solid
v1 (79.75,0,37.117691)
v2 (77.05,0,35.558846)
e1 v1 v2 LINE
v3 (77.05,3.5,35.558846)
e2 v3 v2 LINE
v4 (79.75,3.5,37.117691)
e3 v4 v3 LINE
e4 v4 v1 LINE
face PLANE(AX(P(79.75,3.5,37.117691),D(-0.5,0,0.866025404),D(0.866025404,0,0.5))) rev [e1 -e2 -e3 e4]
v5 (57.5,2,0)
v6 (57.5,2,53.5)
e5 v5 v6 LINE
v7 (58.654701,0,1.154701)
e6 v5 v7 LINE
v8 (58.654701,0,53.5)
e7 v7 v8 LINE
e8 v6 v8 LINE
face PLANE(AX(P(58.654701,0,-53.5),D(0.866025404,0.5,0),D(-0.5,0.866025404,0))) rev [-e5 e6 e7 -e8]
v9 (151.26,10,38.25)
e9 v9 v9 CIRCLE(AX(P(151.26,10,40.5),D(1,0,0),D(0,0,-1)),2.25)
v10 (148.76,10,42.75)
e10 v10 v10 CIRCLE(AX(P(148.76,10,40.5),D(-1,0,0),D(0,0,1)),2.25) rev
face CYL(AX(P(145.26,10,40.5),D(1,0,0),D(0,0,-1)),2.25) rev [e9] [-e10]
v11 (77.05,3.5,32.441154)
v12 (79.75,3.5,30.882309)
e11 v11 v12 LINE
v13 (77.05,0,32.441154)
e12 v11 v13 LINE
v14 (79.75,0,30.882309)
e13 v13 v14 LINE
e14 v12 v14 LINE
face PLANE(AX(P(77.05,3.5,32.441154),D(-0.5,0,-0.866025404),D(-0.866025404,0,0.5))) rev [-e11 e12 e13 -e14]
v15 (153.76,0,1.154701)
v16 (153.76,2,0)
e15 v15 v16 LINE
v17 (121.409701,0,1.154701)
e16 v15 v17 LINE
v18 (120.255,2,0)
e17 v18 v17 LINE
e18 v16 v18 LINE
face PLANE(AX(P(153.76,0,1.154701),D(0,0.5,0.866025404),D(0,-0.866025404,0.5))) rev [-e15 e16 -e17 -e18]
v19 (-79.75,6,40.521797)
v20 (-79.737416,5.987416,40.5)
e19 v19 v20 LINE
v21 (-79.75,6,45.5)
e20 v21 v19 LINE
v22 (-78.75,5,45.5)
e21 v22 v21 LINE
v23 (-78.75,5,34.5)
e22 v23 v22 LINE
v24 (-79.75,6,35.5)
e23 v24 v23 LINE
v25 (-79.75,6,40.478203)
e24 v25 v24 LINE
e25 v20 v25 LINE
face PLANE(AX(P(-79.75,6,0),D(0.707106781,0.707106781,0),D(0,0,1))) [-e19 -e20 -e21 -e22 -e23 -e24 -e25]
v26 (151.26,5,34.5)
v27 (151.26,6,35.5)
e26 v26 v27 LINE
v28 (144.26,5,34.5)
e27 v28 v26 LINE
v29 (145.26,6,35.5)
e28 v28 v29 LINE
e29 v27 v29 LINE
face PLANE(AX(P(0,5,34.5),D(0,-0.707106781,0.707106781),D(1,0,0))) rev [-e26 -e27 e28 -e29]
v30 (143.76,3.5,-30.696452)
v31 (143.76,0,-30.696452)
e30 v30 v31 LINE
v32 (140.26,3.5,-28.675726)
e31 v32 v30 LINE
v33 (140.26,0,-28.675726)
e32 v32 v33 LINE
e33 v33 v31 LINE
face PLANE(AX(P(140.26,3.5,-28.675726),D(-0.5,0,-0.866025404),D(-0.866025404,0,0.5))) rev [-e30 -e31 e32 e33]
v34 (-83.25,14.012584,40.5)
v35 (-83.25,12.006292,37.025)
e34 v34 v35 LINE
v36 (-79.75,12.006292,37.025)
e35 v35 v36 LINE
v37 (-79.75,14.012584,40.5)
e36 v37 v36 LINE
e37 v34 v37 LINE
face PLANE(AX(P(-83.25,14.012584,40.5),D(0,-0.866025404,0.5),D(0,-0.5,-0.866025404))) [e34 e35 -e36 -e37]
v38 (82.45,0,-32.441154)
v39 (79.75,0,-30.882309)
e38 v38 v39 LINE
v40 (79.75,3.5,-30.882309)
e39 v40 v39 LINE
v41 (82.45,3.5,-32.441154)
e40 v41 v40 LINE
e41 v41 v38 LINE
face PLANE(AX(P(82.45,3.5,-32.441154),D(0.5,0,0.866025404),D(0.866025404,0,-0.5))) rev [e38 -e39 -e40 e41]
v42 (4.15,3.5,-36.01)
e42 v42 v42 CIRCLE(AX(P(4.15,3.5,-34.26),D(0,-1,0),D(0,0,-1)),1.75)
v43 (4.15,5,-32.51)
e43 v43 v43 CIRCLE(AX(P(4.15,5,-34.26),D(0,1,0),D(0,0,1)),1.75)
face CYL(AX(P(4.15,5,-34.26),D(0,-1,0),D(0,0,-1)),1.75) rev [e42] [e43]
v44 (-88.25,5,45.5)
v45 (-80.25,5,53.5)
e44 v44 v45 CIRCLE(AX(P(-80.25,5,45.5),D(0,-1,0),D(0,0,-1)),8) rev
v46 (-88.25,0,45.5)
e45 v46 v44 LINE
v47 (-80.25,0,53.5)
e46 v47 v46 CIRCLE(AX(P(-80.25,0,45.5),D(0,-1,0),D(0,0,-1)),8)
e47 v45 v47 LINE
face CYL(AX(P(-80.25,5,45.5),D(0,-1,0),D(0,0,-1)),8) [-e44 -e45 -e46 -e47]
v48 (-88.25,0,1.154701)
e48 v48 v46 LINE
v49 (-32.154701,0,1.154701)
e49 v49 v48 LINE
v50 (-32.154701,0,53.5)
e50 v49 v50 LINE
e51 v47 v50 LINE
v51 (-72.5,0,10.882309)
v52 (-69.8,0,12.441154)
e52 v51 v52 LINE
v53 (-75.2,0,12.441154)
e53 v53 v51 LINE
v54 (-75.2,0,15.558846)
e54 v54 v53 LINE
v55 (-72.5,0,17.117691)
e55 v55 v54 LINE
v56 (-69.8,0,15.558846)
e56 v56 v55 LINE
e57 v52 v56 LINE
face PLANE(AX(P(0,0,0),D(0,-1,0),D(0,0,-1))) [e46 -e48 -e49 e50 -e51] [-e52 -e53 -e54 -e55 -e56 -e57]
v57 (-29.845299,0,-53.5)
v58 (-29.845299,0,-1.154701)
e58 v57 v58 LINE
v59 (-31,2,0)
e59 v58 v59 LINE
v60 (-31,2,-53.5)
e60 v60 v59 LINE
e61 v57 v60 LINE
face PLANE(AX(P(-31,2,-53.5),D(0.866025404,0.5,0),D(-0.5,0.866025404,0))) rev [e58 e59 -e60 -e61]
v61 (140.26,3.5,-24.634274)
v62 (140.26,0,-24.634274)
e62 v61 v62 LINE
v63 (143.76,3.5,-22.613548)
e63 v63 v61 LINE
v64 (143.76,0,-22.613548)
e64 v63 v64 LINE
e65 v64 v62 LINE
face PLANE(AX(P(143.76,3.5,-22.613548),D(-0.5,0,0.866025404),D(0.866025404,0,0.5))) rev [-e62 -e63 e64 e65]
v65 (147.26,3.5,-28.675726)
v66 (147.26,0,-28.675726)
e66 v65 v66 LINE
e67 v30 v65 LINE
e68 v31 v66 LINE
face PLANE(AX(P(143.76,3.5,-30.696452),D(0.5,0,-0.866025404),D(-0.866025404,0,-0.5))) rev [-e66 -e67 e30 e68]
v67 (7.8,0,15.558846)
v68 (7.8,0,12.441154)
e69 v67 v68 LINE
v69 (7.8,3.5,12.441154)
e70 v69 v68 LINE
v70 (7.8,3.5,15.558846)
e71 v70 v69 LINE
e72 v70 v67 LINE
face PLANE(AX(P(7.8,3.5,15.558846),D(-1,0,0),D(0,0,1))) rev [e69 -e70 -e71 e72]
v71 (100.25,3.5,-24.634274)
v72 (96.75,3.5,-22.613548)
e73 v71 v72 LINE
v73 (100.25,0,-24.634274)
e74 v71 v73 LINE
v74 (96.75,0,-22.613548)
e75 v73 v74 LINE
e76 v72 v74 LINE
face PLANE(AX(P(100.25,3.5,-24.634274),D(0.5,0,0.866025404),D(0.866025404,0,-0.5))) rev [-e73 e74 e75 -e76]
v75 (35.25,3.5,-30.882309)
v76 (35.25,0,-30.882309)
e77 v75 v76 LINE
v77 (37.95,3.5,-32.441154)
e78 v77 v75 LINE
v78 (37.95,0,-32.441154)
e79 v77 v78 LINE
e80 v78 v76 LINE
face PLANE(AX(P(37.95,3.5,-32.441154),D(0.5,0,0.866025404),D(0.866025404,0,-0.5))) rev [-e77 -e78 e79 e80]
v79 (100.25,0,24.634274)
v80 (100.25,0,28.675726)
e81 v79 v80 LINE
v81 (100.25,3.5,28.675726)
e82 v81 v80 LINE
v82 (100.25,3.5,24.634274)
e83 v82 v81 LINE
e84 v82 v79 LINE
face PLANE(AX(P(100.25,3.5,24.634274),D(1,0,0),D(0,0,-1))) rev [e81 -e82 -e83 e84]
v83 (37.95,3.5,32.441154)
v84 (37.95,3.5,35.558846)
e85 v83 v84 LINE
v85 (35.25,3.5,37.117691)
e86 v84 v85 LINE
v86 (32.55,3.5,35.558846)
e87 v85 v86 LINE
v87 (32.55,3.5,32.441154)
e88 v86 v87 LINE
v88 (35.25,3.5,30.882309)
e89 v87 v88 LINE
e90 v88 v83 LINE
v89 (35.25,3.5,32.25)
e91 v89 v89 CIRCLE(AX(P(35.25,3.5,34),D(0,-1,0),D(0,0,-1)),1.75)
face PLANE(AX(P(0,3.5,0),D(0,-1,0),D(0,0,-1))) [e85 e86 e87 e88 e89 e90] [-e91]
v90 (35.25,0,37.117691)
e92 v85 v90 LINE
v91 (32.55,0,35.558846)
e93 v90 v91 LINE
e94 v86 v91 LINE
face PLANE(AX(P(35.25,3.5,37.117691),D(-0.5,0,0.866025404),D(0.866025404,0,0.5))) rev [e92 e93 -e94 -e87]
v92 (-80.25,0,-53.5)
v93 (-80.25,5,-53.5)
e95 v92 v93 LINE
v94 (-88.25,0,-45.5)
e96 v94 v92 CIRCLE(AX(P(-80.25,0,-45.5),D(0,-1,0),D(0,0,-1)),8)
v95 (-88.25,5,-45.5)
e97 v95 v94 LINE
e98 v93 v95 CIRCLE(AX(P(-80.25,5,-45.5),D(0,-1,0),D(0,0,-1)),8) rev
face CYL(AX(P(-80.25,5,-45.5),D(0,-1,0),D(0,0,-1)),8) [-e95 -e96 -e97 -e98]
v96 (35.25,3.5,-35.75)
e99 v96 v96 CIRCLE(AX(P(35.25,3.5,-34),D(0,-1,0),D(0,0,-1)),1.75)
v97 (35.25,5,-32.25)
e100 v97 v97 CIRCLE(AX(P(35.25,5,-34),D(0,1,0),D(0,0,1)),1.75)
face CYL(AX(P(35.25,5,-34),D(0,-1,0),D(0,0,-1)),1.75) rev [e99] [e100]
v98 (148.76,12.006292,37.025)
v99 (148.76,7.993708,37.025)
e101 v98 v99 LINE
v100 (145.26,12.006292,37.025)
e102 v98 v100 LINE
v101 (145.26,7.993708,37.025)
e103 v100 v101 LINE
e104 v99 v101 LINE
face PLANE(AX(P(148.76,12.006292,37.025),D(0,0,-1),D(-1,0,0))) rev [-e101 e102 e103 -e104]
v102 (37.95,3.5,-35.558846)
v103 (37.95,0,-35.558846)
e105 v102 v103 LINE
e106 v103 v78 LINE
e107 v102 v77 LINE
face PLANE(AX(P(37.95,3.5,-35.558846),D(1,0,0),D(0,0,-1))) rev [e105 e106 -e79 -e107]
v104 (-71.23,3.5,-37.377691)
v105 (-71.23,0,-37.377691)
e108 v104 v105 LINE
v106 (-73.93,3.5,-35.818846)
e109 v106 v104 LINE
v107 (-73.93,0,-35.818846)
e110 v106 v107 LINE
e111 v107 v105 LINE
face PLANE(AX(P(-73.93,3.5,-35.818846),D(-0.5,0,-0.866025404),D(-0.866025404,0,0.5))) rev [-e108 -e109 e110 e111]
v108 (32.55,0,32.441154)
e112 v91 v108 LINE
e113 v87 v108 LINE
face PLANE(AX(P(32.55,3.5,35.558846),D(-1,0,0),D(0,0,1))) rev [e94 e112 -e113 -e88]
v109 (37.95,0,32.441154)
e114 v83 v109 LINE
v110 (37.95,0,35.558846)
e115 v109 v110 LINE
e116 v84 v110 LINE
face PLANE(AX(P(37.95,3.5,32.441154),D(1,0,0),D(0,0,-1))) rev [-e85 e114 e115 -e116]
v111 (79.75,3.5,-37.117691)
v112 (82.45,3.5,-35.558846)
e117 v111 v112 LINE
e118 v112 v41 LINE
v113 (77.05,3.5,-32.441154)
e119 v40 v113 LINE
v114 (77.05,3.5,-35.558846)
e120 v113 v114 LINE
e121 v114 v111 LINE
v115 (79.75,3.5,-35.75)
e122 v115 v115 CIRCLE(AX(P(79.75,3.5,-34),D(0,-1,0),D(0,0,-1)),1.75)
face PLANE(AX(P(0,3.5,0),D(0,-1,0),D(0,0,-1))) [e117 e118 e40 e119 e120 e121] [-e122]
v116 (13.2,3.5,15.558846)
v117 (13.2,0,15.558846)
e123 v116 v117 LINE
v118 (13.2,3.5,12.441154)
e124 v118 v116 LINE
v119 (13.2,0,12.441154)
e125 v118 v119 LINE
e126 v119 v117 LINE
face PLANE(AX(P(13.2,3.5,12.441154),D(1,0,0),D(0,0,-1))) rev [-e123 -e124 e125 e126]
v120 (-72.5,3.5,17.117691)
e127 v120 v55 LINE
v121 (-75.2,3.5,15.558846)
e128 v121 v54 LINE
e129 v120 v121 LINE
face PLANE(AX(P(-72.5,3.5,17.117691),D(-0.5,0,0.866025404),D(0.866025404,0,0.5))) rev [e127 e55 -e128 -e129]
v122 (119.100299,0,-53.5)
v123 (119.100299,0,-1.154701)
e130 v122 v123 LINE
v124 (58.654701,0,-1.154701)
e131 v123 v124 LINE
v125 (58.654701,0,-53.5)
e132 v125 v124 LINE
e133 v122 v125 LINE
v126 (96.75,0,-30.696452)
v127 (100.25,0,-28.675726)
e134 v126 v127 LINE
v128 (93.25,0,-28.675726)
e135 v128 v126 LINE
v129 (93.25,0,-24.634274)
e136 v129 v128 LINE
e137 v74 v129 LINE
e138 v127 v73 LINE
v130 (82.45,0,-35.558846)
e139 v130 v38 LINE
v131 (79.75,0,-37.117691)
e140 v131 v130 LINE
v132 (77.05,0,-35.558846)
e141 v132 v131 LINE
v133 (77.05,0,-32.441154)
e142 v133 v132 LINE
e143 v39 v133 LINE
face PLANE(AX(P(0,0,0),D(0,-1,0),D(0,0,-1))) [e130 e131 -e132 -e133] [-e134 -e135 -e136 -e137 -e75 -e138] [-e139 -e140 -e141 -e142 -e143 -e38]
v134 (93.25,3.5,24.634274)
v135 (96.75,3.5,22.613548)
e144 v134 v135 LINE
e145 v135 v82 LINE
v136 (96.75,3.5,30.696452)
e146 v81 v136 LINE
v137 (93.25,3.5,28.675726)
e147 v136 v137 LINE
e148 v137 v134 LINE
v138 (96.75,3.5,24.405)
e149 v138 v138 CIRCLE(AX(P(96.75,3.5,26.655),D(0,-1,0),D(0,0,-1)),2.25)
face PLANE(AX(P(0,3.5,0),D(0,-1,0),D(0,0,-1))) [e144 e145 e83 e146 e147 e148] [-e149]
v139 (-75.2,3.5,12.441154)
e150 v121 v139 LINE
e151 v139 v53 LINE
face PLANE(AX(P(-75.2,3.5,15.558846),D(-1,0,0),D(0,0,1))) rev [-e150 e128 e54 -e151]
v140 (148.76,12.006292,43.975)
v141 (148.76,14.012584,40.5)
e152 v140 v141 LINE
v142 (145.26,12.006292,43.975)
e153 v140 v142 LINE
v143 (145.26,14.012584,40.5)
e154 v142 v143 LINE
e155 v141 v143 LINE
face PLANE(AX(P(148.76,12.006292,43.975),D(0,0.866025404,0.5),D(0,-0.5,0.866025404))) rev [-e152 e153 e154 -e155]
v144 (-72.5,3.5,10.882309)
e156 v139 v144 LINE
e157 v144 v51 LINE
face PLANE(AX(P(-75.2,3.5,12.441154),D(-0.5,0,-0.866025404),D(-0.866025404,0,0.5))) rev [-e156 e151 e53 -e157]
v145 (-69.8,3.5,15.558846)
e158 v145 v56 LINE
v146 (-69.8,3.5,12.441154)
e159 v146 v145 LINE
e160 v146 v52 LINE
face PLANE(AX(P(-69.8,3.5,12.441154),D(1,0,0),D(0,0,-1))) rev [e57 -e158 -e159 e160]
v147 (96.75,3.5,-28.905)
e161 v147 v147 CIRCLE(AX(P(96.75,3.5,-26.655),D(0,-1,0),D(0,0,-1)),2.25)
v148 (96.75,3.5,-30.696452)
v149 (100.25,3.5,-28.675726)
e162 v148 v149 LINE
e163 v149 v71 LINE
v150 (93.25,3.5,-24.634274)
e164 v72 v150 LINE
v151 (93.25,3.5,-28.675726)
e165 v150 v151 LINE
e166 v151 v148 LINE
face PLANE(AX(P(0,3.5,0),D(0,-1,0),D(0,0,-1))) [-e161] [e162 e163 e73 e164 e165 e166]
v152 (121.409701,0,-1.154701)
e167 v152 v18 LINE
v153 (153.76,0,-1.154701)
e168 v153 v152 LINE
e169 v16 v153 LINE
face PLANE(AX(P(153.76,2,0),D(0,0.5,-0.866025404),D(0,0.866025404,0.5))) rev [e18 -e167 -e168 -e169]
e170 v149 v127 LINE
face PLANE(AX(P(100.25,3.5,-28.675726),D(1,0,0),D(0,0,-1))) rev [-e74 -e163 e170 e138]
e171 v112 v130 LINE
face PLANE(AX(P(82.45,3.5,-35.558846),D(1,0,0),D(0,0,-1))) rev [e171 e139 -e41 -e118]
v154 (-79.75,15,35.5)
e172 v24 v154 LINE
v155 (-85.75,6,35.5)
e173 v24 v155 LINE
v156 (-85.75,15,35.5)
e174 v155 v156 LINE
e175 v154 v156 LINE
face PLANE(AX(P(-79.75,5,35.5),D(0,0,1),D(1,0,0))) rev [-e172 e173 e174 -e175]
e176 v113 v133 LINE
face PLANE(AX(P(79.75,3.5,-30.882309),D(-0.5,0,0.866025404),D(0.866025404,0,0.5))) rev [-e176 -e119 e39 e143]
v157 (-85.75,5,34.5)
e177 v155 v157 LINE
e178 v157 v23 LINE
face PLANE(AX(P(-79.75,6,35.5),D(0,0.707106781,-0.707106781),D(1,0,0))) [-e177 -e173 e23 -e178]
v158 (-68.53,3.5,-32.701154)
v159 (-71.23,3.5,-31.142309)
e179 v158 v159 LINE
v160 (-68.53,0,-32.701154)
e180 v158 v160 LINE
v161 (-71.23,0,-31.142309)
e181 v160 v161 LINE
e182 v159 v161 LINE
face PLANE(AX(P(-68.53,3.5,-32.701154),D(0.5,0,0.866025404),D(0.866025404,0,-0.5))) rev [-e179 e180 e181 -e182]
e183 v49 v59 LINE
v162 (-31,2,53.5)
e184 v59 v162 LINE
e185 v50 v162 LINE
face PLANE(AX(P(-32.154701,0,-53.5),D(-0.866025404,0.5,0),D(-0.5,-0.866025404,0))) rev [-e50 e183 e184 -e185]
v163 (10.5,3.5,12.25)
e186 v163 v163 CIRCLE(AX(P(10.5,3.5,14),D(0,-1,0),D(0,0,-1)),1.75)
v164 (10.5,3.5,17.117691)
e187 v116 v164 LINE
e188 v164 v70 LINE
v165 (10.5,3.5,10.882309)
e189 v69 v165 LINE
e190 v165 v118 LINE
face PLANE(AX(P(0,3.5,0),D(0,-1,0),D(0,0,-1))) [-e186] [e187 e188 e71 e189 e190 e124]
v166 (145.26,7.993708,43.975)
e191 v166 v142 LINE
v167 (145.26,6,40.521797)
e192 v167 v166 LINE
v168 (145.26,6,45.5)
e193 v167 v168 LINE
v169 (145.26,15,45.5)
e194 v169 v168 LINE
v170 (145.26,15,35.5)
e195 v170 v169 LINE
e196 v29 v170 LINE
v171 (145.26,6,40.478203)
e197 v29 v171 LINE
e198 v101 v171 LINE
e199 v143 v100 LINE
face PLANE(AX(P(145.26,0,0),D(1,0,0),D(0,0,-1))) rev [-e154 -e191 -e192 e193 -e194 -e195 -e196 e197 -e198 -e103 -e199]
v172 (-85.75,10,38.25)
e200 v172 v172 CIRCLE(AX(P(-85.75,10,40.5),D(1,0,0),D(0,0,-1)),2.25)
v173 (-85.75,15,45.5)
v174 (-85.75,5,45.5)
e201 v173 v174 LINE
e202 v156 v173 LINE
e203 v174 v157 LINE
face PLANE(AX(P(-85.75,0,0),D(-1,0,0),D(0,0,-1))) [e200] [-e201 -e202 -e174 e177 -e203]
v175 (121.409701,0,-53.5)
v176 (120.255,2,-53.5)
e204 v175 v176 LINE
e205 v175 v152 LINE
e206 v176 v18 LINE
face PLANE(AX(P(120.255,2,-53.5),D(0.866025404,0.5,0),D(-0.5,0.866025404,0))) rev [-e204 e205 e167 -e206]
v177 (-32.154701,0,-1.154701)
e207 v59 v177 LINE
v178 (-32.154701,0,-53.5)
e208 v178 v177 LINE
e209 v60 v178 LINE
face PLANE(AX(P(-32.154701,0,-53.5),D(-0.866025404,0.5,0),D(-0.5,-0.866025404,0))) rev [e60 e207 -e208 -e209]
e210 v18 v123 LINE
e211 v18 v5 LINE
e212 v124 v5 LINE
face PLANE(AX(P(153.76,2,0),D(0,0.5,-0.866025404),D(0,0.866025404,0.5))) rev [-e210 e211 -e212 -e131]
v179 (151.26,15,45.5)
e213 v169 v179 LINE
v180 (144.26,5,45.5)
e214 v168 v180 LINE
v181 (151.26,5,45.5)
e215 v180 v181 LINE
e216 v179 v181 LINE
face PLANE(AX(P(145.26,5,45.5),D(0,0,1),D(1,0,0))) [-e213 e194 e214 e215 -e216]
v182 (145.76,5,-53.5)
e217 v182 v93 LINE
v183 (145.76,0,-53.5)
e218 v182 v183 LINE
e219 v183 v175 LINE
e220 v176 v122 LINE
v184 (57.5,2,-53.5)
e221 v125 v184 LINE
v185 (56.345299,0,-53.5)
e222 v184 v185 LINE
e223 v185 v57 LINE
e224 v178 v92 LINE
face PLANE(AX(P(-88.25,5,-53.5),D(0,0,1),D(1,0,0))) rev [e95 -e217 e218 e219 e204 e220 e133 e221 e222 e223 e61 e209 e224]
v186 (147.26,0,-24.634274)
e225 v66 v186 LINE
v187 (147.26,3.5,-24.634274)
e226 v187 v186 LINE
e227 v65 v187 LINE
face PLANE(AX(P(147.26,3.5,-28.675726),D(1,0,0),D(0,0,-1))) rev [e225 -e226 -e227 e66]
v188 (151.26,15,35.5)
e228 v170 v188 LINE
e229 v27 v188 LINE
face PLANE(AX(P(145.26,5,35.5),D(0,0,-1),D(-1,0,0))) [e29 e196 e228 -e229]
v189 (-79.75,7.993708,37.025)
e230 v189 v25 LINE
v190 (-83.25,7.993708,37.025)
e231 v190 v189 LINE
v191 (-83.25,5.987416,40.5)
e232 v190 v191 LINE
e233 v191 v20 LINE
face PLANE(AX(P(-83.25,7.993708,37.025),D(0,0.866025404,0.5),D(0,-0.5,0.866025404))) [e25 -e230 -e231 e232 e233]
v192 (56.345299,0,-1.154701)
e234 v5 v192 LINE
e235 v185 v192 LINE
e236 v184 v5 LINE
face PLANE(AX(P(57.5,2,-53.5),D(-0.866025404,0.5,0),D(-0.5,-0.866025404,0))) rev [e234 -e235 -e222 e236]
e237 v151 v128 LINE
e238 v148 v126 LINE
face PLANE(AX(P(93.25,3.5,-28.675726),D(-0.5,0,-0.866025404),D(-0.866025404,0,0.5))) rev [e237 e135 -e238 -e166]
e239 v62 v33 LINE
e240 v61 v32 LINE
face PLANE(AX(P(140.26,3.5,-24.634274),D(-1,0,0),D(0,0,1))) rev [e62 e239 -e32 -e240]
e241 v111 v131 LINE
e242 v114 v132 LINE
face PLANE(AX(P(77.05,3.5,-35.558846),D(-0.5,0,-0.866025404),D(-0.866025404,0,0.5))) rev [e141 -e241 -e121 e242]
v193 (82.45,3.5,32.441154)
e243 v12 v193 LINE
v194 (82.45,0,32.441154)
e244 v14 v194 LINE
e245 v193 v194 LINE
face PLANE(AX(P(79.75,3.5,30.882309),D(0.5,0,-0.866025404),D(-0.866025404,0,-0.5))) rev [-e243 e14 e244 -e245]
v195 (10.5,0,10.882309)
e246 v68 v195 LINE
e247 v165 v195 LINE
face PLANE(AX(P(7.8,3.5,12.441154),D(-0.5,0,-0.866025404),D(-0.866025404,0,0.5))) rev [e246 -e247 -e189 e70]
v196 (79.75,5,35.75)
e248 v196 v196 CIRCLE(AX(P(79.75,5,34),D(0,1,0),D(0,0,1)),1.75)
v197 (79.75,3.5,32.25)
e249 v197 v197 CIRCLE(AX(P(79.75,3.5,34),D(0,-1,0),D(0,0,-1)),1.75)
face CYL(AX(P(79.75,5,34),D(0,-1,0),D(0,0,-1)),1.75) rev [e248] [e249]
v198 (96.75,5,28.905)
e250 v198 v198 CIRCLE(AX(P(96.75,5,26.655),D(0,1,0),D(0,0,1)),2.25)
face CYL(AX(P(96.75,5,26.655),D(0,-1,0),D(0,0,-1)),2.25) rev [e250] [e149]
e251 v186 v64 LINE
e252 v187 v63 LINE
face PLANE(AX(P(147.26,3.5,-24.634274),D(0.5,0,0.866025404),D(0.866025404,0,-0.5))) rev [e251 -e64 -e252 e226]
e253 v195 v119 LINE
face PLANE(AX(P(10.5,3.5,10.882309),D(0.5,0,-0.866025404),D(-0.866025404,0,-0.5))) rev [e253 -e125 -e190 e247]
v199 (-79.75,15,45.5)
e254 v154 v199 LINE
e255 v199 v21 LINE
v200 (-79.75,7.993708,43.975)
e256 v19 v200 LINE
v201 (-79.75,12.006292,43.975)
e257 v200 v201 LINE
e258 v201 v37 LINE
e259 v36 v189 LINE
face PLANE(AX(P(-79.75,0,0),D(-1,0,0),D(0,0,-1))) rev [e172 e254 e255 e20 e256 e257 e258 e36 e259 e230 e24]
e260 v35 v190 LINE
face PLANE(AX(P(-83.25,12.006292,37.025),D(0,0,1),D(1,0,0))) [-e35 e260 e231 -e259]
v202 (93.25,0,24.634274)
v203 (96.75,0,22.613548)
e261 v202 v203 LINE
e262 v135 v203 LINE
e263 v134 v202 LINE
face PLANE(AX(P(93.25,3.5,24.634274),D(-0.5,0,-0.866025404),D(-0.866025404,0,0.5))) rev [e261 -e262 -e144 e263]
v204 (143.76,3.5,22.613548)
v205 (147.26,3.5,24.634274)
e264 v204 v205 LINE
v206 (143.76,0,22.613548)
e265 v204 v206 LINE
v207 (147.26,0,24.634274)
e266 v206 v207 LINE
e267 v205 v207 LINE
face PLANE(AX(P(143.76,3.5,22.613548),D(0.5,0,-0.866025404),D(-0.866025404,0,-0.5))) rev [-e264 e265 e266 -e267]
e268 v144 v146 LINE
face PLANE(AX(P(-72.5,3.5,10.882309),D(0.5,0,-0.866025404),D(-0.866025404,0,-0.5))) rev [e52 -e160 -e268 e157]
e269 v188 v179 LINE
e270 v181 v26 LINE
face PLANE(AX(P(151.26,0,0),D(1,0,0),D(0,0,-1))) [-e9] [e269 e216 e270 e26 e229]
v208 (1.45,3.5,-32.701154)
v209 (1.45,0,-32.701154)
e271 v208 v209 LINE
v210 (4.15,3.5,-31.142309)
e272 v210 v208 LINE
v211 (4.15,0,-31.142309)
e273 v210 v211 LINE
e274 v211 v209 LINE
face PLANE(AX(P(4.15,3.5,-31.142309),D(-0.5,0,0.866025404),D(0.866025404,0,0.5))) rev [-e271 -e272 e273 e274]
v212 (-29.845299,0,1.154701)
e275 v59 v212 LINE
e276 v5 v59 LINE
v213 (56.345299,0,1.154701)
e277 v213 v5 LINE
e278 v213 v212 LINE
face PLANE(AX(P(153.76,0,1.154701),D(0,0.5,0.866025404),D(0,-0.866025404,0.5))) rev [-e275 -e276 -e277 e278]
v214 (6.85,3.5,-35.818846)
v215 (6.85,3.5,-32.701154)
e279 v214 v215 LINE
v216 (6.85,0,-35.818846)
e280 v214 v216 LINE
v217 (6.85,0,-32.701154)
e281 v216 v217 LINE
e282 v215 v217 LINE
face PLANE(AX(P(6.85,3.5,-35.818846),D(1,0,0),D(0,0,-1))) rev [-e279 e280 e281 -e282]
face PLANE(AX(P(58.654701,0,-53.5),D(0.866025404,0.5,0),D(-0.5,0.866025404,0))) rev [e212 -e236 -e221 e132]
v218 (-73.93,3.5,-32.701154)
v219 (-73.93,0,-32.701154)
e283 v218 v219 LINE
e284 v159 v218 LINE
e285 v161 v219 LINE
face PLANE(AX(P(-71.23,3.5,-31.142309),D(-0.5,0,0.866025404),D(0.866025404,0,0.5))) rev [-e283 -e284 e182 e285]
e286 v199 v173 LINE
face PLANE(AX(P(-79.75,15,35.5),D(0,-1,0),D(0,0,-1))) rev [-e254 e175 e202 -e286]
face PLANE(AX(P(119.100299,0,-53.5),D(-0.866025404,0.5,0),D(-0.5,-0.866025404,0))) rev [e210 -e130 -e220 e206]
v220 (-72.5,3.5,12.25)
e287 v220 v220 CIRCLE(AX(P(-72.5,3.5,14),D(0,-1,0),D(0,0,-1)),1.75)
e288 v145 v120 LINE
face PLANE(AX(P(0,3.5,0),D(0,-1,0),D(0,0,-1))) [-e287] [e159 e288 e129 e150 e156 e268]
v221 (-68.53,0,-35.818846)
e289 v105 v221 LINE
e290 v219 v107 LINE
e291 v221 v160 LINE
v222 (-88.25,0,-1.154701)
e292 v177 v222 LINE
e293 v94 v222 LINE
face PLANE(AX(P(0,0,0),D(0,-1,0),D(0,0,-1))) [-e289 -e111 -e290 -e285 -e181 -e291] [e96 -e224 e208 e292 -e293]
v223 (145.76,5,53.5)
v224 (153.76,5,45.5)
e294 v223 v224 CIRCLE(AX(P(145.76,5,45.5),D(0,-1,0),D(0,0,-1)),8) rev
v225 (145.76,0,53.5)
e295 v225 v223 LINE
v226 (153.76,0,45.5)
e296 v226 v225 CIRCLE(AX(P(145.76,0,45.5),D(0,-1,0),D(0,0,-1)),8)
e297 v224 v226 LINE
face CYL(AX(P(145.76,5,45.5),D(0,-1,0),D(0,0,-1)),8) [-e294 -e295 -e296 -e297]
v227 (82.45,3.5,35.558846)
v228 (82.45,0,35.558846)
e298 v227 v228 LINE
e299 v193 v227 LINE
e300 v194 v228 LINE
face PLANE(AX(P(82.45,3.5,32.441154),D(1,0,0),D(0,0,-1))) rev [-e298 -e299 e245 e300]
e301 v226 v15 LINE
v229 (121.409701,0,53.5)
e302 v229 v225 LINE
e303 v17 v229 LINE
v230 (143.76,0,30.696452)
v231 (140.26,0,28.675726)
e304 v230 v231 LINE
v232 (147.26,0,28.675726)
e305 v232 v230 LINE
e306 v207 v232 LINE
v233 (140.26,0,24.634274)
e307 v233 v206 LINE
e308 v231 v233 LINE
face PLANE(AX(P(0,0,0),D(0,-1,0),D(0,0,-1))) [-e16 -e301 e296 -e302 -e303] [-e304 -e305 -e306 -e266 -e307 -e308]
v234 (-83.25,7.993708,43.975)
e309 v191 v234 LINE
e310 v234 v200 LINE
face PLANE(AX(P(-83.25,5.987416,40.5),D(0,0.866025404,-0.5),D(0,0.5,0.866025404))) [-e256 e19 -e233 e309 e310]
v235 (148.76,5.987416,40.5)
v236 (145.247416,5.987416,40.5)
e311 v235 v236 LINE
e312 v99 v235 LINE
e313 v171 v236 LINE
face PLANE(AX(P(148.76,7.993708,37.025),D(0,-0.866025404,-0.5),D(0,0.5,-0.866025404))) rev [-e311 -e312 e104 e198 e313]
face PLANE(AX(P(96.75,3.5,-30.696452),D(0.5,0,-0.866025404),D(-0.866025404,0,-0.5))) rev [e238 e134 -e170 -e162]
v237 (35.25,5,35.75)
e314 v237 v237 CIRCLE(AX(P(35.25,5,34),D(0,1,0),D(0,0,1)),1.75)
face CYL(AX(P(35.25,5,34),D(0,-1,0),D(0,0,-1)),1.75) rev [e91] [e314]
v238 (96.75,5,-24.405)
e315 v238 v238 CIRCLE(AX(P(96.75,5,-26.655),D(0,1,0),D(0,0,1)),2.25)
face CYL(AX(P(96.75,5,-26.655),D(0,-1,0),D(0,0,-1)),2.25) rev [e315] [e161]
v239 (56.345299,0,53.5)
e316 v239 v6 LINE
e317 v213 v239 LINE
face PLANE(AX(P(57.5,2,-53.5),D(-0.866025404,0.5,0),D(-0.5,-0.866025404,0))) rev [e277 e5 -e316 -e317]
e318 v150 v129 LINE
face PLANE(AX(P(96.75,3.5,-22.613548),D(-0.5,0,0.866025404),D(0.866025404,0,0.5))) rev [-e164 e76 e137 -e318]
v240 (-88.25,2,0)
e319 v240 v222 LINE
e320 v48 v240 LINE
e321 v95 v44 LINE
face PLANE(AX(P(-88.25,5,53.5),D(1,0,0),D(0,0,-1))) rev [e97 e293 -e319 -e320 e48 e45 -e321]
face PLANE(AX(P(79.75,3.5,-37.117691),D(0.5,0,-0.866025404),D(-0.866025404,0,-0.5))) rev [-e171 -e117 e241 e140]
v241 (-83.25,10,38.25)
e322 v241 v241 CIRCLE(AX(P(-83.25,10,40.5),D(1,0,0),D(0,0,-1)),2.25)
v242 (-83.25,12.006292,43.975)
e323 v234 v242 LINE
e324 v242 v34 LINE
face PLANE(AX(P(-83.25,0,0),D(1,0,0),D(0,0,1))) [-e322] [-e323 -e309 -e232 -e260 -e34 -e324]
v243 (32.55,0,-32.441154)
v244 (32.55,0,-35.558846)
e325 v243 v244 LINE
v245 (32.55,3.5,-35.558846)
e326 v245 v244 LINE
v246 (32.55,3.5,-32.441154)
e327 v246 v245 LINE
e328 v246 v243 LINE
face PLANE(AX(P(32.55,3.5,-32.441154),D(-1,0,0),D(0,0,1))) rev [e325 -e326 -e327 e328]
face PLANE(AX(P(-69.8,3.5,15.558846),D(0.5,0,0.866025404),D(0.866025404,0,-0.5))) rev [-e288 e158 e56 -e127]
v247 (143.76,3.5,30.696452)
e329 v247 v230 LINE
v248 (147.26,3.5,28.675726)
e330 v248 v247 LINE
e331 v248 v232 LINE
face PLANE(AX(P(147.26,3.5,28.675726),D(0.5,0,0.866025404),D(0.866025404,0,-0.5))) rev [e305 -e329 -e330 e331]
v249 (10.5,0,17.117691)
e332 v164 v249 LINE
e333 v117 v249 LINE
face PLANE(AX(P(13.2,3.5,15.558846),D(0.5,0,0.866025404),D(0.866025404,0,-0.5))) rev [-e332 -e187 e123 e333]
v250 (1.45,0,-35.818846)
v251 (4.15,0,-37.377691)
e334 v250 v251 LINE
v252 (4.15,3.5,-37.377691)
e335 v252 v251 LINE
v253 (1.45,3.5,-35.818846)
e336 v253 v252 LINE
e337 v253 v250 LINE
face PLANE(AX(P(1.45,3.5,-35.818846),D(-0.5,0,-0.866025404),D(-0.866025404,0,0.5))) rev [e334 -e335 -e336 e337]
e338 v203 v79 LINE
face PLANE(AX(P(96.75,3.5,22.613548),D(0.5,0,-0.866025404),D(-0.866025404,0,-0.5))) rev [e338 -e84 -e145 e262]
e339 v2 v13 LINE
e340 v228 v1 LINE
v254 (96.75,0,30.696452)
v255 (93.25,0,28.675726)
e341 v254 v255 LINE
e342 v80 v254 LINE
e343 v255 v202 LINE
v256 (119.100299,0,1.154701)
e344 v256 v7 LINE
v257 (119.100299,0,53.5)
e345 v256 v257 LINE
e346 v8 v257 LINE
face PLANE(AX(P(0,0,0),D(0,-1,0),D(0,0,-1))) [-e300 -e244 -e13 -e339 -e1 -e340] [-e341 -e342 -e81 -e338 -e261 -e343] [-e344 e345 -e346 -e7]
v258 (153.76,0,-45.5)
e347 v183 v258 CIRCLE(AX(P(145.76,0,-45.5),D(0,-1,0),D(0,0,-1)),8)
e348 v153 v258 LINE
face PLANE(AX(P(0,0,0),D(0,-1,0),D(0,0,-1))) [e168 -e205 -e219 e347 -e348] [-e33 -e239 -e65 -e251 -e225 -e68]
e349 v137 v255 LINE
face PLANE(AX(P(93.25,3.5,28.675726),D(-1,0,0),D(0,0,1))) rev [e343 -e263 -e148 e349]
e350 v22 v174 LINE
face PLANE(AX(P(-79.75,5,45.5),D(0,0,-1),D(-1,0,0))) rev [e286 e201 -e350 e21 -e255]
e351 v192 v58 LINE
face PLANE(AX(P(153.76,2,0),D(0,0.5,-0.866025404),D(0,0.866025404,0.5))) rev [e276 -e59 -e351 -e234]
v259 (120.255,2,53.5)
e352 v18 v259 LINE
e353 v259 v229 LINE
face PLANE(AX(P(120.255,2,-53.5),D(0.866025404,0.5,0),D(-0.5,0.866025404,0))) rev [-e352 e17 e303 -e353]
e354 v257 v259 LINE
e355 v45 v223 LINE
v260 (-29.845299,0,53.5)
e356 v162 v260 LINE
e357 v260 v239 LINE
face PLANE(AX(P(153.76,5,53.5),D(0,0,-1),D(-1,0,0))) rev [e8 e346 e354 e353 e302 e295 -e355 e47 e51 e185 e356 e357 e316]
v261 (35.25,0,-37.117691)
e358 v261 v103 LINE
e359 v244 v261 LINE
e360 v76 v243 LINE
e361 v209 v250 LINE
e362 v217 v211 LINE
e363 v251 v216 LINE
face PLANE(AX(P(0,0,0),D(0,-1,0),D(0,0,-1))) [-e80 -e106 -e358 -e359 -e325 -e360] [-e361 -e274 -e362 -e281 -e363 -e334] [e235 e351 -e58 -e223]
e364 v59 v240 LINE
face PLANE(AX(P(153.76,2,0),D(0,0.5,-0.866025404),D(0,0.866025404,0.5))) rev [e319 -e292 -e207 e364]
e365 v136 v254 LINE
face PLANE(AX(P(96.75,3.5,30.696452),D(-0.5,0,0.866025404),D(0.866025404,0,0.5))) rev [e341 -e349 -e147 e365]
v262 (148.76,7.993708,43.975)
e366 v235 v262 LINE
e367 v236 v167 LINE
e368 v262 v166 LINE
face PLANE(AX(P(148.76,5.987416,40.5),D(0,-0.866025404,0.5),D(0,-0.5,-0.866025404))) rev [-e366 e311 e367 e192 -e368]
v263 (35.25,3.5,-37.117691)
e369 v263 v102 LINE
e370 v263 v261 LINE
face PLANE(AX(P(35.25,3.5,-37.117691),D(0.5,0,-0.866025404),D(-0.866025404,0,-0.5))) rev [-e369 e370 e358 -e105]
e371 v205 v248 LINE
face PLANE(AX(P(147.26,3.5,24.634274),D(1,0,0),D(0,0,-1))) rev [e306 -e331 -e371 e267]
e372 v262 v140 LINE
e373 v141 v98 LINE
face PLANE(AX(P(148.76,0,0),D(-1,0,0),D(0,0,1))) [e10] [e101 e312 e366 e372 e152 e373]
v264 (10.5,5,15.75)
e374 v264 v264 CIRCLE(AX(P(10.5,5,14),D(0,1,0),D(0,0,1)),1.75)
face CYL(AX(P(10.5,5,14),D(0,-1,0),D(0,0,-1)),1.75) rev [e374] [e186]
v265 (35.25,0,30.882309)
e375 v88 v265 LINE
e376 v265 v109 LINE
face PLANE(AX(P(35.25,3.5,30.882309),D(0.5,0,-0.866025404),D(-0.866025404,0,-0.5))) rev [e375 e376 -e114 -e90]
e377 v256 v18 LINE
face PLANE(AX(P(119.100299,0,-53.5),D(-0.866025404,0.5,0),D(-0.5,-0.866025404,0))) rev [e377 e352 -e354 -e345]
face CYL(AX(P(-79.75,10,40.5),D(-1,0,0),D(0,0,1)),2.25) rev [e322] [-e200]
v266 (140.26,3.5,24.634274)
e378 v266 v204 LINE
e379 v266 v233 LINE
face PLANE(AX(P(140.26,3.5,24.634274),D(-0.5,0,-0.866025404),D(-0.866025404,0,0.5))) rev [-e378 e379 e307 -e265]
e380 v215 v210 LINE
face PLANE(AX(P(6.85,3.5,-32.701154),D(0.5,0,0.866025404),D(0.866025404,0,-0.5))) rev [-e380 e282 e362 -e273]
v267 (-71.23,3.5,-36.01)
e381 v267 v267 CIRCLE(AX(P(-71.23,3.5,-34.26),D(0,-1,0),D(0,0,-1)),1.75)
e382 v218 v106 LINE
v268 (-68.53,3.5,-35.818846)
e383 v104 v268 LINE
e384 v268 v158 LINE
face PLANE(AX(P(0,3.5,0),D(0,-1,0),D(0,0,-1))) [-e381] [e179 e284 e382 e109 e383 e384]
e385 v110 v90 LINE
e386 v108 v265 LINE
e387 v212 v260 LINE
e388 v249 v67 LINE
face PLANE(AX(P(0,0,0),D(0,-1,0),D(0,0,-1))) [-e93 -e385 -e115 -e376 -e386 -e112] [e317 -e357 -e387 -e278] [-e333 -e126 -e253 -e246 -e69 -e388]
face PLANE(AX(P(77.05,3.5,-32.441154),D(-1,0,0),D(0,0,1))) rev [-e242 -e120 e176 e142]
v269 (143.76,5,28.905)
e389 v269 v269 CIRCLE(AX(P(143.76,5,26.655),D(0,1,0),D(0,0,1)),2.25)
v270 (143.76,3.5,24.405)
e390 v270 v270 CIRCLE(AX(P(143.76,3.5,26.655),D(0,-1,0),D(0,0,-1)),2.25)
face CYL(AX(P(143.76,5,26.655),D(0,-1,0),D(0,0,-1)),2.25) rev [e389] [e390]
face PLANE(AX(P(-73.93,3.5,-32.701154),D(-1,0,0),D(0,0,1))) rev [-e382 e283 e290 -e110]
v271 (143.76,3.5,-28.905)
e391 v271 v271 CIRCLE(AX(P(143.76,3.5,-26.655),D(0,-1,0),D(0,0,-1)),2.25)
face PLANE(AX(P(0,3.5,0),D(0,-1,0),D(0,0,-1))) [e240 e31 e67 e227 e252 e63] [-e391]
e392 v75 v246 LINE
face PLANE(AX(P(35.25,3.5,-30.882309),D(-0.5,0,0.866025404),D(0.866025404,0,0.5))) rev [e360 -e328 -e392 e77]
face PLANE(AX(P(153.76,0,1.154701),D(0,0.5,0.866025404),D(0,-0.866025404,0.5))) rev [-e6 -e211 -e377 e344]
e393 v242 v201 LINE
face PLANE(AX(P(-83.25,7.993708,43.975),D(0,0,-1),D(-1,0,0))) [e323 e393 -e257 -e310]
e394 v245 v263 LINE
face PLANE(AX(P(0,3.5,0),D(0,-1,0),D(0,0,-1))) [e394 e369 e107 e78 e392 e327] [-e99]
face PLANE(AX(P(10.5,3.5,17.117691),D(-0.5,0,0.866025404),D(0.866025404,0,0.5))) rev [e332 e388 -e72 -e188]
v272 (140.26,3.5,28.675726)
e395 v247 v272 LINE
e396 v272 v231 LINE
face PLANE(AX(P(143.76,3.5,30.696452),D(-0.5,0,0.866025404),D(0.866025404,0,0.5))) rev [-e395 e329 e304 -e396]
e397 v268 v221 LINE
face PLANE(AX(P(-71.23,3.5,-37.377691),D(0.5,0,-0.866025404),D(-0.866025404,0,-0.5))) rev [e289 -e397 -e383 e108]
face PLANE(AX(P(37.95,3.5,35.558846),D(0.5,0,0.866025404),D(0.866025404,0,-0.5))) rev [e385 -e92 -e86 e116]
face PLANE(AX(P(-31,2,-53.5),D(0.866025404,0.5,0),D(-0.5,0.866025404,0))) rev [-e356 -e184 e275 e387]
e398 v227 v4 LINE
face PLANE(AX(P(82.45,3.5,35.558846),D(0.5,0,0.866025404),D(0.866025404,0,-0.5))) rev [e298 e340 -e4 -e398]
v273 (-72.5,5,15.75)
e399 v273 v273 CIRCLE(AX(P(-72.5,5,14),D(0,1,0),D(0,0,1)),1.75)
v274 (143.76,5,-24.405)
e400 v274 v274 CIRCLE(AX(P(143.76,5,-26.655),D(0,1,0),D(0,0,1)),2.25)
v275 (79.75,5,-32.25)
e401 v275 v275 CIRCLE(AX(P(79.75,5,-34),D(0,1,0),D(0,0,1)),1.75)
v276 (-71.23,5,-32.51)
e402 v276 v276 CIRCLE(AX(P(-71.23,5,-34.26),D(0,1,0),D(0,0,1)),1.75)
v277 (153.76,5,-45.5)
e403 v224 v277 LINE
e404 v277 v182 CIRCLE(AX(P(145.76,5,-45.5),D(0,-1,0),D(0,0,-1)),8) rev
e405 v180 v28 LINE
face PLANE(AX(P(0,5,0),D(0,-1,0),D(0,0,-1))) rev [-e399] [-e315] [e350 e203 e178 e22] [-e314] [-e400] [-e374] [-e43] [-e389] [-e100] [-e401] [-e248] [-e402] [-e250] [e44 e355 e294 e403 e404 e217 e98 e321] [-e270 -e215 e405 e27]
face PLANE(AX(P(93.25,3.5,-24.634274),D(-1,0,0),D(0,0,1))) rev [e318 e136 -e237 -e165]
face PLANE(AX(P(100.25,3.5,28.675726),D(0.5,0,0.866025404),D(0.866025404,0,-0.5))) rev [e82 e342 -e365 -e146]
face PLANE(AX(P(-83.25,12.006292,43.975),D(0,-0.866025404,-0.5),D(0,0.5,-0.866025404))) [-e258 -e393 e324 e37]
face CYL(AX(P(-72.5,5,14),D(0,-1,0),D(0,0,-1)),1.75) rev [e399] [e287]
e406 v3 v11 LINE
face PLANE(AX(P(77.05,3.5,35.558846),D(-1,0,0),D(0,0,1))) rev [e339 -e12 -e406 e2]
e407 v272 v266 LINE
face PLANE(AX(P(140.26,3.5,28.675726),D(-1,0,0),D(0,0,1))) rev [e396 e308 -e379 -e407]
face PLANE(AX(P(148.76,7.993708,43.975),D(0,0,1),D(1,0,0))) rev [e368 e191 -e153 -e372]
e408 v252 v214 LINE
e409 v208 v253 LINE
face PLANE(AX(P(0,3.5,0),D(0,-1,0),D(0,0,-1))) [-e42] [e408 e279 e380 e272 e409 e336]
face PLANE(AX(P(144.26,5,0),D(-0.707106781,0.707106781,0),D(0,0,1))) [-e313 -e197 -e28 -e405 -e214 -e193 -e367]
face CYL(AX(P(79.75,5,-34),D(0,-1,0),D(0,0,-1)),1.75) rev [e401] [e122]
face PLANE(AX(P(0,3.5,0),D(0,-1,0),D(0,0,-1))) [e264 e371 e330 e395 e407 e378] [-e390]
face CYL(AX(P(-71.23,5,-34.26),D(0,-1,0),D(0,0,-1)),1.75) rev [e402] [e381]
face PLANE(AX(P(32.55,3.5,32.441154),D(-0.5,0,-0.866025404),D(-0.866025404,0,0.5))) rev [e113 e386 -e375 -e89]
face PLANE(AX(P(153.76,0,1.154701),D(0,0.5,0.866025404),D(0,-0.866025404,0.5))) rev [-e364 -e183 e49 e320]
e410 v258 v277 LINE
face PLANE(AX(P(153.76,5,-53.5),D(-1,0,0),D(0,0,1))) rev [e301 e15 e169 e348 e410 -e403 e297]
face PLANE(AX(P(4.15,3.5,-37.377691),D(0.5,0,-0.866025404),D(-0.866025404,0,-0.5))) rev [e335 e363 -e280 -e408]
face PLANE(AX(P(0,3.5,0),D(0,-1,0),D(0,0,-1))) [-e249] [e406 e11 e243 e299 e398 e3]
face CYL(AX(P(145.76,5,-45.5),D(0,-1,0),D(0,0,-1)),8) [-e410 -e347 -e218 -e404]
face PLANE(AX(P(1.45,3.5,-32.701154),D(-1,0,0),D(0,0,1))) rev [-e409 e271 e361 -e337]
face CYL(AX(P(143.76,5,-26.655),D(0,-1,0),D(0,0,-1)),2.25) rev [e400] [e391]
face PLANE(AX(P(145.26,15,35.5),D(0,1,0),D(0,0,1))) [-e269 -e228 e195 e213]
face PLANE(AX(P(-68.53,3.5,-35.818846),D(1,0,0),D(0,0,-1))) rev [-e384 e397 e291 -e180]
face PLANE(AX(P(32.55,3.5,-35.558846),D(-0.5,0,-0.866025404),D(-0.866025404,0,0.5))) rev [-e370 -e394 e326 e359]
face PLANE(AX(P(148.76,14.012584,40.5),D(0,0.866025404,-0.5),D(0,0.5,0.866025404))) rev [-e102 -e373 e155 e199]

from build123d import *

# Parameters (mm, degrees)
SKETCH3_W               = 242.01
SKETCH3_H               = 107
SKETCH3_R               = 1.75
SKETCH3_R_2             = 2.25
BOSS_EXTRUDE3_DEPTH     = 5
CUT_EXTRUDE1_DEPTH      = 3.5
SKETCH7_W               = 10
SKETCH7_H               = 10
SKETCH7_R               = 2.25
BOSS_EXTRUDE4_DEPTH     = 6
CUT_EXTRUDE2_DEPTH      = 3.5
FILLET1_R               = 8
SKETCH9_W               = 29.32110464
SKETCH9_H               = 129.190564079
CUT_EXTRUDE3_DEPTH      = 10
SKETCH10_W              = 10
SKETCH10_H              = 10
SKETCH10_R              = 2.25
BOSS_EXTRUDE5_DEPTH     = 6
CUT_EXTRUDE4_DEPTH      = 3.5
CUT_EXTRUDE5_DEPTH      = 188.925883263
CUT_EXTRUDE5_DEPTH_BACK = 188.925883263
CUT_EXTRUDE6_DEPTH      = 249.306443936
CUT_EXTRUDE6_DEPTH_BACK = 249.306443936
CHAMFER1_SIZE           = 1


with BuildPart() as part:
    # Sketch3 → Boss-Extrude3 (new body)
    with BuildSketch(Plane(origin=(0, 0, 0), x_dir=(1, 0, 0), z_dir=(0, 1, 0))):
        with Locations((32.755, 0)):
            Rectangle(SKETCH3_W, SKETCH3_H)
        with Locations(Location((-72.5, -14, 0), (0, 0, 270))):
            Circle(SKETCH3_R, mode=Mode.SUBTRACT)
        with Locations(Location((10.5, -14, 0), (0, 0, 270))):
            Circle(SKETCH3_R, mode=Mode.SUBTRACT)
        with Locations(Location((96.75, -26.655, 0), (0, 0, 270))):
            Circle(SKETCH3_R_2, mode=Mode.SUBTRACT)
        with Locations(Location((96.75, 26.655, 0), (0, 0, 270))):
            Circle(SKETCH3_R_2, mode=Mode.SUBTRACT)
        with Locations(Location((143.76, 26.655, 0), (0, 0, 270))):
            Circle(SKETCH3_R_2, mode=Mode.SUBTRACT)
        with Locations(Location((143.76, -26.655, 0), (0, 0, 270))):
            Circle(SKETCH3_R_2, mode=Mode.SUBTRACT)
        with Locations(Location((35.25, 34, 0), (0, 0, 270))):
            Circle(SKETCH3_R, mode=Mode.SUBTRACT)
        with Locations(Location((79.75, 34, 0), (0, 0, 270))):
            Circle(SKETCH3_R, mode=Mode.SUBTRACT)
        with Locations(Location((35.25, -34, 0), (0, 0, 270))):
            Circle(SKETCH3_R, mode=Mode.SUBTRACT)
        with Locations(Location((79.75, -34, 0), (0, 0, 270))):
            Circle(SKETCH3_R, mode=Mode.SUBTRACT)
        with Locations(Location((-71.23, 34.26, 0), (0, 0, 270))):
            Circle(SKETCH3_R, mode=Mode.SUBTRACT)
        with Locations(Location((4.15, 34.26, 0), (0, 0, 270))):
            Circle(SKETCH3_R, mode=Mode.SUBTRACT)
    extrude(amount=BOSS_EXTRUDE3_DEPTH)

    # Sketch4 → Cut-Extrude1 (cut)
    with BuildSketch(Plane.XZ):
        Polygon((96.75, 30.696451884), (93.25, 28.675725942), (93.25, 24.634274058), (96.75, 22.613548116), (100.25, 24.634274058), (100.25, 28.675725942), align=None)
        Polygon((143.76, 30.696451884), (140.26, 28.675725942), (140.26, 24.634274058), (143.76, 22.613548116), (147.26, 24.634274058), (147.26, 28.675725942), align=None)
        Polygon((96.75, -22.613548116), (93.25, -24.634274058), (93.25, -28.675725942), (96.75, -30.696451884), (100.25, -28.675725942), (100.25, -24.634274058), align=None)
        Polygon((143.76, -30.696451884), (147.26, -28.675725942), (147.26, -24.634274058), (143.76, -22.613548116), (140.26, -24.634274058), (140.26, -28.675725942), align=None)
        Polygon((-72.5, 17.117691454), (-75.2, 15.558845727), (-75.2, 12.441154273), (-72.5, 10.882308546), (-69.8, 12.441154273), (-69.8, 15.558845727), align=None)
        Polygon((10.5, 17.117691454), (7.8, 15.558845727), (7.8, 12.441154273), (10.5, 10.882308546), (13.2, 12.441154273), (13.2, 15.558845727), align=None)
        Polygon((35.25, 37.117691454), (32.55, 35.558845727), (32.55, 32.441154273), (35.25, 30.882308546), (37.95, 32.441154273), (37.95, 35.558845727), align=None)
        Polygon((79.75, 37.117691454), (77.05, 35.558845727), (77.05, 32.441154273), (79.75, 30.882308546), (82.45, 32.441154273), (82.45, 35.558845727), align=None)
        Polygon((79.75, -30.882308546), (77.05, -32.441154273), (77.05, -35.558845727), (79.75, -37.117691454), (82.45, -35.558845727), (82.45, -32.441154273), align=None)
        Polygon((35.25, -30.882308546), (32.55, -32.441154273), (32.55, -35.558845727), (35.25, -37.117691454), (37.95, -35.558845727), (37.95, -32.441154273), align=None)
        Polygon((-71.23, -31.142308546), (-73.93, -32.701154273), (-73.93, -35.818845727), (-71.23, -37.377691454), (-68.53, -35.818845727), (-68.53, -32.701154273), align=None)
        Polygon((4.15, -31.142308546), (1.45, -32.701154273), (1.45, -35.818845727), (4.15, -37.377691454), (6.85, -35.818845727), (6.85, -32.701154273), align=None)
    extrude(amount=-CUT_EXTRUDE1_DEPTH, mode=Mode.SUBTRACT)

    # Sketch7 → Boss-Extrude4 (add)
    with BuildSketch(Plane.XY.offset(51)):
        with Locations((58, 10)):
            Rectangle(SKETCH7_W, SKETCH7_H)
        with Locations((58, 10)):
            Circle(SKETCH7_R, mode=Mode.SUBTRACT)
    boss_extrude4 = extrude(amount=-BOSS_EXTRUDE4_DEPTH)

    # Sketch8 → Cut-Extrude2 (cut)
    with BuildSketch(Plane(origin=(0, 0, 45), x_dir=(-1, 0, 0), z_dir=(0, 0, -1))):
        Polygon((-58, 14.012584371), (-61.475, 12.006292185), (-61.475, 7.993707815), (-58, 5.987415629), (-54.525, 7.993707815), (-54.525, 12.006292185), align=None)
    cut_extrude2 = extrude(amount=-CUT_EXTRUDE2_DEPTH, mode=Mode.SUBTRACT)

    # Mirror1: Boss-Extrude4, Cut-Extrude2 across plane
    add(boss_extrude4.mirror(Plane.XY))
    add(cut_extrude2.mirror(Plane.XY), mode=Mode.SUBTRACT)

    # Fillet1
    fillet1_edges = [part.edges().sort_by_distance(p)[0] for p in [
        (-88.25, 2.5, 53.5),
        (-88.25, 2.5, -53.5),
        (153.76, 2.5, -53.5),
        (153.76, 2.5, 53.5),
    ]]
    fillet(fillet1_edges, radius=FILLET1_R)

    # Sketch9 → Cut-Extrude3 (cut)
    with BuildSketch(Plane(origin=(0, 5, 0), x_dir=(1, 0, 0), z_dir=(0, 1, 0))):
        with Locations((53.635180577, -6.372276825)):
            Rectangle(SKETCH9_W, SKETCH9_H)
    extrude(amount=CUT_EXTRUDE3_DEPTH, mode=Mode.SUBTRACT)

    # Sketch10 → Boss-Extrude5 (add)
    with BuildSketch(Plane(origin=(151.26, 0, 0), x_dir=(0, 0, -1), z_dir=(1, 0, 0))):
        with Locations((-40.5, 10)):
            Rectangle(SKETCH10_W, SKETCH10_H)
        with Locations((-40.5, 10)):
            Circle(SKETCH10_R, mode=Mode.SUBTRACT)
    boss_extrude5 = extrude(amount=-BOSS_EXTRUDE5_DEPTH)

    # Sketch11 → Cut-Extrude4 (cut)
    with BuildSketch(Plane.ZY.offset(-145.26)):
        Polygon((40.5, 14.012584371), (37.025, 12.006292185), (37.025, 7.993707815), (40.5, 5.987415629), (43.975, 7.993707815), (43.975, 12.006292185), align=None)
    cut_extrude4 = extrude(amount=-CUT_EXTRUDE4_DEPTH, mode=Mode.SUBTRACT)

    # Mirror2: Boss-Extrude5, Cut-Extrude4 across plane
    add(boss_extrude5.mirror(Plane(origin=(32.755, 0, 0), x_dir=(0, 0, 1), z_dir=(1, 0, 0))))
    add(cut_extrude4.mirror(Plane(origin=(32.755, 0, 0), x_dir=(0, 0, 1), z_dir=(1, 0, 0))), mode=Mode.SUBTRACT)

    # Sketch13 → Cut-Extrude5 (cut, two sides: drawn at the far end of the back side and taken through both)
    with BuildSketch(Plane.XY.offset(53.5).offset(-CUT_EXTRUDE5_DEPTH_BACK)):
        Polygon((-32.154700538, 0), (-31, 2), (-29.845299462, 0), align=None)
        Polygon((56.345299462, 0), (58.654700538, 0), (57.5, 2), align=None)
        Polygon((119.100299462, 0), (120.255, 2), (121.409700538, 0), align=None)
    extrude(amount=CUT_EXTRUDE5_DEPTH + CUT_EXTRUDE5_DEPTH_BACK, mode=Mode.SUBTRACT)

    # Sketch14 → Cut-Extrude6 (cut, two sides: drawn at the far end of the back side and taken through both)
    with BuildSketch(Plane.ZY.offset(88.25).offset(-CUT_EXTRUDE6_DEPTH_BACK)):
        Polygon((-1.154700538, 0), (1.154700538, 0), (0, 2), align=None)
    extrude(amount=CUT_EXTRUDE6_DEPTH + CUT_EXTRUDE6_DEPTH_BACK, mode=Mode.SUBTRACT)

    # Chamfer1
    # the kernel refuses this chamfer: 1 mm, written as the material it adds along each edge
    with BuildSketch(Plane(origin=(145.26, 5, 35.5), x_dir=(-0.9996219169112968, -0.027495876610586605, 0), z_dir=(0, 0, 1))) as chamfer1_piece_1_section:
        Polygon((CHAMFER1_SIZE * 0.999621916911, -CHAMFER1_SIZE * 0.0274958766106), (-CHAMFER1_SIZE * 0.0274958766106, -CHAMFER1_SIZE * 0.999621916911), (0, 0), align=None)
    chamfer1_piece_1 = extrude(amount=10, mode=Mode.PRIVATE)
    chamfer1_piece_1 = split(chamfer1_piece_1, bisect_by=Plane(origin=(144.945420732, 7.148640324, 38.488699829), z_dir=(0, -0.8660254037844382, -0.5000000000000009)), keep=Keep.TOP, mode=Mode.PRIVATE)
    chamfer1_piece_1 = split(chamfer1_piece_1, bisect_by=Plane(origin=(144.945420732, 4.51160926, 37.943828386), z_dir=(0, 0.8660254037844392, -0.4999999999999993)), keep=Keep.TOP, mode=Mode.PRIVATE)
    add(chamfer1_piece_1)
    with BuildSketch(Plane(origin=(145.26, 5, 35.5), x_dir=(-0.9996219169112968, -0.027495876610586605, 0), z_dir=(0, 0, 1))) as chamfer1_piece_2_section:
        Polygon((CHAMFER1_SIZE * 0.999621916911, -CHAMFER1_SIZE * 0.0274958766106), (-CHAMFER1_SIZE * 0.0274958766106, -CHAMFER1_SIZE * 0.999621916911), (0, 0), align=None)
    chamfer1_piece_2 = extrude(amount=10, mode=Mode.PRIVATE)
    chamfer1_piece_2 = split(chamfer1_piece_2, bisect_by=Plane(origin=(144.878613731, 5.798883763, 40.826546771), z_dir=(0, -0.8660254037844382, -0.5000000000000009)), keep=Keep.TOP, mode=Mode.PRIVATE)
    chamfer1_piece_2 = split(chamfer1_piece_2, bisect_by=Plane(origin=(144.878613731, 5.798883763, 40.173453229), z_dir=(0, -0.8660254037844392, 0.4999999999999993)), keep=Keep.TOP, mode=Mode.PRIVATE)
    add(chamfer1_piece_2)
    with BuildSketch(Plane(origin=(145.26, 5, 35.5), x_dir=(-0.9996219169112968, -0.027495876610586605, 0), z_dir=(0, 0, 1))) as chamfer1_piece_3_section:
        Polygon((CHAMFER1_SIZE * 0.999621916911, -CHAMFER1_SIZE * 0.0274958766106), (-CHAMFER1_SIZE * 0.0274958766106, -CHAMFER1_SIZE * 0.999621916911), (0, 0), align=None)
    chamfer1_piece_3 = extrude(amount=10, mode=Mode.PRIVATE)
    chamfer1_piece_3 = split(chamfer1_piece_3, bisect_by=Plane(origin=(144.945420732, 4.51160926, 43.056171614), z_dir=(0, 0.8660254037844382, 0.5000000000000009)), keep=Keep.TOP, mode=Mode.PRIVATE)
    chamfer1_piece_3 = split(chamfer1_piece_3, bisect_by=Plane(origin=(144.945420732, 7.148640324, 42.511300171), z_dir=(0, -0.8660254037844392, 0.4999999999999993)), keep=Keep.TOP, mode=Mode.PRIVATE)
    add(chamfer1_piece_3)
    with BuildSketch(Plane(origin=(151.26, 5, 35.5), x_dir=(0, -0.027495876610586414, -0.9996219169112968), z_dir=(-1, 0, 0))) as chamfer1_piece_4:
        Polygon((CHAMFER1_SIZE * 0.999621916911, -CHAMFER1_SIZE * 0.0274958766106), (-CHAMFER1_SIZE * 0.0274958766106, -CHAMFER1_SIZE * 0.999621916911), (0, 0), align=None)
    extrude(amount=6)
    with BuildSketch(Plane(origin=(-79.75, 5, 35.5), x_dir=(0.9996219169112968, -0.027495876610586605, 0), z_dir=(0, 0, 1))) as chamfer1_piece_5_section:
        Polygon((CHAMFER1_SIZE * 0.999621916911, CHAMFER1_SIZE * 0.0274958766106), (-CHAMFER1_SIZE * 0.0274958766106, CHAMFER1_SIZE * 0.999621916911), (0, 0), align=None)
    chamfer1_piece_5 = extrude(amount=10, mode=Mode.PRIVATE)
    chamfer1_piece_5 = split(chamfer1_piece_5, bisect_by=Plane(origin=(-79.435420732, 7.148640324, 38.488699829), z_dir=(0, -0.8660254037844382, -0.5000000000000009)), keep=Keep.TOP, mode=Mode.PRIVATE)
    chamfer1_piece_5 = split(chamfer1_piece_5, bisect_by=Plane(origin=(-79.435420732, 4.51160926, 37.943828386), z_dir=(0, 0.8660254037844392, -0.4999999999999993)), keep=Keep.TOP, mode=Mode.PRIVATE)
    add(chamfer1_piece_5)
    with BuildSketch(Plane(origin=(-79.75, 5, 35.5), x_dir=(0.9996219169112968, -0.027495876610586605, 0), z_dir=(0, 0, 1))) as chamfer1_piece_6_section:
        Polygon((CHAMFER1_SIZE * 0.999621916911, CHAMFER1_SIZE * 0.0274958766106), (-CHAMFER1_SIZE * 0.0274958766106, CHAMFER1_SIZE * 0.999621916911), (0, 0), align=None)
    chamfer1_piece_6 = extrude(amount=10, mode=Mode.PRIVATE)
    chamfer1_piece_6 = split(chamfer1_piece_6, bisect_by=Plane(origin=(-79.368613731, 5.798883763, 40.826546771), z_dir=(0, -0.8660254037844382, -0.5000000000000009)), keep=Keep.TOP, mode=Mode.PRIVATE)
    chamfer1_piece_6 = split(chamfer1_piece_6, bisect_by=Plane(origin=(-79.368613731, 5.798883763, 40.173453229), z_dir=(0, -0.8660254037844392, 0.4999999999999993)), keep=Keep.TOP, mode=Mode.PRIVATE)
    add(chamfer1_piece_6)
    with BuildSketch(Plane(origin=(-79.75, 5, 35.5), x_dir=(0.9996219169112968, -0.027495876610586605, 0), z_dir=(0, 0, 1))) as chamfer1_piece_7_section:
        Polygon((CHAMFER1_SIZE * 0.999621916911, CHAMFER1_SIZE * 0.0274958766106), (-CHAMFER1_SIZE * 0.0274958766106, CHAMFER1_SIZE * 0.999621916911), (0, 0), align=None)
    chamfer1_piece_7 = extrude(amount=10, mode=Mode.PRIVATE)
    chamfer1_piece_7 = split(chamfer1_piece_7, bisect_by=Plane(origin=(-79.435420732, 4.51160926, 43.056171614), z_dir=(0, 0.8660254037844382, 0.5000000000000009)), keep=Keep.TOP, mode=Mode.PRIVATE)
    chamfer1_piece_7 = split(chamfer1_piece_7, bisect_by=Plane(origin=(-79.435420732, 7.148640324, 42.511300171), z_dir=(0, -0.8660254037844392, 0.4999999999999993)), keep=Keep.TOP, mode=Mode.PRIVATE)
    add(chamfer1_piece_7)
    with BuildSketch(Plane(origin=(-85.75, 5, 35.5), x_dir=(0, -0.027495876610586414, -0.9996219169112968), z_dir=(1, 0, 0))) as chamfer1_piece_8:
        Polygon((CHAMFER1_SIZE * 0.999621916911, CHAMFER1_SIZE * 0.0274958766106), (-CHAMFER1_SIZE * 0.0274958766106, CHAMFER1_SIZE * 0.999621916911), (0, 0), align=None)
    extrude(amount=6)
    with BuildSketch(Plane(origin=(151.26, 5, 35.5), x_dir=(0, -0.027495876610586414, -0.9996219169112968), z_dir=(-1, 0, 0))) as chamfer1_piece_9a_section:
        Polygon((CHAMFER1_SIZE * 0.999621916911, -CHAMFER1_SIZE * 0.0274958766106), (-CHAMFER1_SIZE * 0.0274958766106, -CHAMFER1_SIZE * 0.999621916911), (0, 0), align=None)
    chamfer1_piece_9a = extrude(amount=8.571682988, mode=Mode.PRIVATE)
    chamfer1_piece_9a = split(chamfer1_piece_9a, bisect_by=Plane(origin=(145.26, 5.329793627, 35.170206373), z_dir=(-1, 0, 0)), keep=Keep.TOP, mode=Mode.PRIVATE)
    with BuildSketch(Plane(origin=(145.26, 5, 32.928317012), x_dir=(-0.9996219169112968, -0.027495876610586605, 0), z_dir=(0, 0, 1))) as chamfer1_piece_9b_section:
        Polygon((CHAMFER1_SIZE * 0.999621916911, -CHAMFER1_SIZE * 0.0274958766106), (-CHAMFER1_SIZE * 0.0274958766106, -CHAMFER1_SIZE * 0.999621916911), (0, 0), align=None)
    chamfer1_piece_9b = extrude(amount=12.571682988, mode=Mode.PRIVATE)
    chamfer1_piece_9b = split(chamfer1_piece_9b, bisect_by=Plane(origin=(144.930206373, 5.329793627, 35.5), z_dir=(0, 0, -1)), keep=Keep.TOP, mode=Mode.PRIVATE)
    chamfer1_piece_9 = chamfer1_piece_9a & chamfer1_piece_9b
    add(chamfer1_piece_9)
    with BuildSketch(Plane(origin=(-85.75, 5, 35.5), x_dir=(0, -0.027495876610586414, -0.9996219169112968), z_dir=(1, 0, 0))) as chamfer1_piece_10a_section:
        Polygon((CHAMFER1_SIZE * 0.999621916911, CHAMFER1_SIZE * 0.0274958766106), (-CHAMFER1_SIZE * 0.0274958766106, CHAMFER1_SIZE * 0.999621916911), (0, 0), align=None)
    chamfer1_piece_10a = extrude(amount=8.571682988, mode=Mode.PRIVATE)
    chamfer1_piece_10a = split(chamfer1_piece_10a, bisect_by=Plane(origin=(-79.75, 5.329793627, 35.170206373), z_dir=(1, 0, 0)), keep=Keep.TOP, mode=Mode.PRIVATE)
    with BuildSketch(Plane(origin=(-79.75, 5, 32.928317012), x_dir=(0.9996219169112968, -0.027495876610586605, 0), z_dir=(0, 0, 1))) as chamfer1_piece_10b_section:
        Polygon((CHAMFER1_SIZE * 0.999621916911, CHAMFER1_SIZE * 0.0274958766106), (-CHAMFER1_SIZE * 0.0274958766106, CHAMFER1_SIZE * 0.999621916911), (0, 0), align=None)
    chamfer1_piece_10b = extrude(amount=12.571682988, mode=Mode.PRIVATE)
    chamfer1_piece_10b = split(chamfer1_piece_10b, bisect_by=Plane(origin=(-79.420206373, 5.329793627, 35.5), z_dir=(0, 0, -1)), keep=Keep.TOP, mode=Mode.PRIVATE)
    chamfer1_piece_10 = chamfer1_piece_10a & chamfer1_piece_10b
    add(chamfer1_piece_10)


solid = part.part
